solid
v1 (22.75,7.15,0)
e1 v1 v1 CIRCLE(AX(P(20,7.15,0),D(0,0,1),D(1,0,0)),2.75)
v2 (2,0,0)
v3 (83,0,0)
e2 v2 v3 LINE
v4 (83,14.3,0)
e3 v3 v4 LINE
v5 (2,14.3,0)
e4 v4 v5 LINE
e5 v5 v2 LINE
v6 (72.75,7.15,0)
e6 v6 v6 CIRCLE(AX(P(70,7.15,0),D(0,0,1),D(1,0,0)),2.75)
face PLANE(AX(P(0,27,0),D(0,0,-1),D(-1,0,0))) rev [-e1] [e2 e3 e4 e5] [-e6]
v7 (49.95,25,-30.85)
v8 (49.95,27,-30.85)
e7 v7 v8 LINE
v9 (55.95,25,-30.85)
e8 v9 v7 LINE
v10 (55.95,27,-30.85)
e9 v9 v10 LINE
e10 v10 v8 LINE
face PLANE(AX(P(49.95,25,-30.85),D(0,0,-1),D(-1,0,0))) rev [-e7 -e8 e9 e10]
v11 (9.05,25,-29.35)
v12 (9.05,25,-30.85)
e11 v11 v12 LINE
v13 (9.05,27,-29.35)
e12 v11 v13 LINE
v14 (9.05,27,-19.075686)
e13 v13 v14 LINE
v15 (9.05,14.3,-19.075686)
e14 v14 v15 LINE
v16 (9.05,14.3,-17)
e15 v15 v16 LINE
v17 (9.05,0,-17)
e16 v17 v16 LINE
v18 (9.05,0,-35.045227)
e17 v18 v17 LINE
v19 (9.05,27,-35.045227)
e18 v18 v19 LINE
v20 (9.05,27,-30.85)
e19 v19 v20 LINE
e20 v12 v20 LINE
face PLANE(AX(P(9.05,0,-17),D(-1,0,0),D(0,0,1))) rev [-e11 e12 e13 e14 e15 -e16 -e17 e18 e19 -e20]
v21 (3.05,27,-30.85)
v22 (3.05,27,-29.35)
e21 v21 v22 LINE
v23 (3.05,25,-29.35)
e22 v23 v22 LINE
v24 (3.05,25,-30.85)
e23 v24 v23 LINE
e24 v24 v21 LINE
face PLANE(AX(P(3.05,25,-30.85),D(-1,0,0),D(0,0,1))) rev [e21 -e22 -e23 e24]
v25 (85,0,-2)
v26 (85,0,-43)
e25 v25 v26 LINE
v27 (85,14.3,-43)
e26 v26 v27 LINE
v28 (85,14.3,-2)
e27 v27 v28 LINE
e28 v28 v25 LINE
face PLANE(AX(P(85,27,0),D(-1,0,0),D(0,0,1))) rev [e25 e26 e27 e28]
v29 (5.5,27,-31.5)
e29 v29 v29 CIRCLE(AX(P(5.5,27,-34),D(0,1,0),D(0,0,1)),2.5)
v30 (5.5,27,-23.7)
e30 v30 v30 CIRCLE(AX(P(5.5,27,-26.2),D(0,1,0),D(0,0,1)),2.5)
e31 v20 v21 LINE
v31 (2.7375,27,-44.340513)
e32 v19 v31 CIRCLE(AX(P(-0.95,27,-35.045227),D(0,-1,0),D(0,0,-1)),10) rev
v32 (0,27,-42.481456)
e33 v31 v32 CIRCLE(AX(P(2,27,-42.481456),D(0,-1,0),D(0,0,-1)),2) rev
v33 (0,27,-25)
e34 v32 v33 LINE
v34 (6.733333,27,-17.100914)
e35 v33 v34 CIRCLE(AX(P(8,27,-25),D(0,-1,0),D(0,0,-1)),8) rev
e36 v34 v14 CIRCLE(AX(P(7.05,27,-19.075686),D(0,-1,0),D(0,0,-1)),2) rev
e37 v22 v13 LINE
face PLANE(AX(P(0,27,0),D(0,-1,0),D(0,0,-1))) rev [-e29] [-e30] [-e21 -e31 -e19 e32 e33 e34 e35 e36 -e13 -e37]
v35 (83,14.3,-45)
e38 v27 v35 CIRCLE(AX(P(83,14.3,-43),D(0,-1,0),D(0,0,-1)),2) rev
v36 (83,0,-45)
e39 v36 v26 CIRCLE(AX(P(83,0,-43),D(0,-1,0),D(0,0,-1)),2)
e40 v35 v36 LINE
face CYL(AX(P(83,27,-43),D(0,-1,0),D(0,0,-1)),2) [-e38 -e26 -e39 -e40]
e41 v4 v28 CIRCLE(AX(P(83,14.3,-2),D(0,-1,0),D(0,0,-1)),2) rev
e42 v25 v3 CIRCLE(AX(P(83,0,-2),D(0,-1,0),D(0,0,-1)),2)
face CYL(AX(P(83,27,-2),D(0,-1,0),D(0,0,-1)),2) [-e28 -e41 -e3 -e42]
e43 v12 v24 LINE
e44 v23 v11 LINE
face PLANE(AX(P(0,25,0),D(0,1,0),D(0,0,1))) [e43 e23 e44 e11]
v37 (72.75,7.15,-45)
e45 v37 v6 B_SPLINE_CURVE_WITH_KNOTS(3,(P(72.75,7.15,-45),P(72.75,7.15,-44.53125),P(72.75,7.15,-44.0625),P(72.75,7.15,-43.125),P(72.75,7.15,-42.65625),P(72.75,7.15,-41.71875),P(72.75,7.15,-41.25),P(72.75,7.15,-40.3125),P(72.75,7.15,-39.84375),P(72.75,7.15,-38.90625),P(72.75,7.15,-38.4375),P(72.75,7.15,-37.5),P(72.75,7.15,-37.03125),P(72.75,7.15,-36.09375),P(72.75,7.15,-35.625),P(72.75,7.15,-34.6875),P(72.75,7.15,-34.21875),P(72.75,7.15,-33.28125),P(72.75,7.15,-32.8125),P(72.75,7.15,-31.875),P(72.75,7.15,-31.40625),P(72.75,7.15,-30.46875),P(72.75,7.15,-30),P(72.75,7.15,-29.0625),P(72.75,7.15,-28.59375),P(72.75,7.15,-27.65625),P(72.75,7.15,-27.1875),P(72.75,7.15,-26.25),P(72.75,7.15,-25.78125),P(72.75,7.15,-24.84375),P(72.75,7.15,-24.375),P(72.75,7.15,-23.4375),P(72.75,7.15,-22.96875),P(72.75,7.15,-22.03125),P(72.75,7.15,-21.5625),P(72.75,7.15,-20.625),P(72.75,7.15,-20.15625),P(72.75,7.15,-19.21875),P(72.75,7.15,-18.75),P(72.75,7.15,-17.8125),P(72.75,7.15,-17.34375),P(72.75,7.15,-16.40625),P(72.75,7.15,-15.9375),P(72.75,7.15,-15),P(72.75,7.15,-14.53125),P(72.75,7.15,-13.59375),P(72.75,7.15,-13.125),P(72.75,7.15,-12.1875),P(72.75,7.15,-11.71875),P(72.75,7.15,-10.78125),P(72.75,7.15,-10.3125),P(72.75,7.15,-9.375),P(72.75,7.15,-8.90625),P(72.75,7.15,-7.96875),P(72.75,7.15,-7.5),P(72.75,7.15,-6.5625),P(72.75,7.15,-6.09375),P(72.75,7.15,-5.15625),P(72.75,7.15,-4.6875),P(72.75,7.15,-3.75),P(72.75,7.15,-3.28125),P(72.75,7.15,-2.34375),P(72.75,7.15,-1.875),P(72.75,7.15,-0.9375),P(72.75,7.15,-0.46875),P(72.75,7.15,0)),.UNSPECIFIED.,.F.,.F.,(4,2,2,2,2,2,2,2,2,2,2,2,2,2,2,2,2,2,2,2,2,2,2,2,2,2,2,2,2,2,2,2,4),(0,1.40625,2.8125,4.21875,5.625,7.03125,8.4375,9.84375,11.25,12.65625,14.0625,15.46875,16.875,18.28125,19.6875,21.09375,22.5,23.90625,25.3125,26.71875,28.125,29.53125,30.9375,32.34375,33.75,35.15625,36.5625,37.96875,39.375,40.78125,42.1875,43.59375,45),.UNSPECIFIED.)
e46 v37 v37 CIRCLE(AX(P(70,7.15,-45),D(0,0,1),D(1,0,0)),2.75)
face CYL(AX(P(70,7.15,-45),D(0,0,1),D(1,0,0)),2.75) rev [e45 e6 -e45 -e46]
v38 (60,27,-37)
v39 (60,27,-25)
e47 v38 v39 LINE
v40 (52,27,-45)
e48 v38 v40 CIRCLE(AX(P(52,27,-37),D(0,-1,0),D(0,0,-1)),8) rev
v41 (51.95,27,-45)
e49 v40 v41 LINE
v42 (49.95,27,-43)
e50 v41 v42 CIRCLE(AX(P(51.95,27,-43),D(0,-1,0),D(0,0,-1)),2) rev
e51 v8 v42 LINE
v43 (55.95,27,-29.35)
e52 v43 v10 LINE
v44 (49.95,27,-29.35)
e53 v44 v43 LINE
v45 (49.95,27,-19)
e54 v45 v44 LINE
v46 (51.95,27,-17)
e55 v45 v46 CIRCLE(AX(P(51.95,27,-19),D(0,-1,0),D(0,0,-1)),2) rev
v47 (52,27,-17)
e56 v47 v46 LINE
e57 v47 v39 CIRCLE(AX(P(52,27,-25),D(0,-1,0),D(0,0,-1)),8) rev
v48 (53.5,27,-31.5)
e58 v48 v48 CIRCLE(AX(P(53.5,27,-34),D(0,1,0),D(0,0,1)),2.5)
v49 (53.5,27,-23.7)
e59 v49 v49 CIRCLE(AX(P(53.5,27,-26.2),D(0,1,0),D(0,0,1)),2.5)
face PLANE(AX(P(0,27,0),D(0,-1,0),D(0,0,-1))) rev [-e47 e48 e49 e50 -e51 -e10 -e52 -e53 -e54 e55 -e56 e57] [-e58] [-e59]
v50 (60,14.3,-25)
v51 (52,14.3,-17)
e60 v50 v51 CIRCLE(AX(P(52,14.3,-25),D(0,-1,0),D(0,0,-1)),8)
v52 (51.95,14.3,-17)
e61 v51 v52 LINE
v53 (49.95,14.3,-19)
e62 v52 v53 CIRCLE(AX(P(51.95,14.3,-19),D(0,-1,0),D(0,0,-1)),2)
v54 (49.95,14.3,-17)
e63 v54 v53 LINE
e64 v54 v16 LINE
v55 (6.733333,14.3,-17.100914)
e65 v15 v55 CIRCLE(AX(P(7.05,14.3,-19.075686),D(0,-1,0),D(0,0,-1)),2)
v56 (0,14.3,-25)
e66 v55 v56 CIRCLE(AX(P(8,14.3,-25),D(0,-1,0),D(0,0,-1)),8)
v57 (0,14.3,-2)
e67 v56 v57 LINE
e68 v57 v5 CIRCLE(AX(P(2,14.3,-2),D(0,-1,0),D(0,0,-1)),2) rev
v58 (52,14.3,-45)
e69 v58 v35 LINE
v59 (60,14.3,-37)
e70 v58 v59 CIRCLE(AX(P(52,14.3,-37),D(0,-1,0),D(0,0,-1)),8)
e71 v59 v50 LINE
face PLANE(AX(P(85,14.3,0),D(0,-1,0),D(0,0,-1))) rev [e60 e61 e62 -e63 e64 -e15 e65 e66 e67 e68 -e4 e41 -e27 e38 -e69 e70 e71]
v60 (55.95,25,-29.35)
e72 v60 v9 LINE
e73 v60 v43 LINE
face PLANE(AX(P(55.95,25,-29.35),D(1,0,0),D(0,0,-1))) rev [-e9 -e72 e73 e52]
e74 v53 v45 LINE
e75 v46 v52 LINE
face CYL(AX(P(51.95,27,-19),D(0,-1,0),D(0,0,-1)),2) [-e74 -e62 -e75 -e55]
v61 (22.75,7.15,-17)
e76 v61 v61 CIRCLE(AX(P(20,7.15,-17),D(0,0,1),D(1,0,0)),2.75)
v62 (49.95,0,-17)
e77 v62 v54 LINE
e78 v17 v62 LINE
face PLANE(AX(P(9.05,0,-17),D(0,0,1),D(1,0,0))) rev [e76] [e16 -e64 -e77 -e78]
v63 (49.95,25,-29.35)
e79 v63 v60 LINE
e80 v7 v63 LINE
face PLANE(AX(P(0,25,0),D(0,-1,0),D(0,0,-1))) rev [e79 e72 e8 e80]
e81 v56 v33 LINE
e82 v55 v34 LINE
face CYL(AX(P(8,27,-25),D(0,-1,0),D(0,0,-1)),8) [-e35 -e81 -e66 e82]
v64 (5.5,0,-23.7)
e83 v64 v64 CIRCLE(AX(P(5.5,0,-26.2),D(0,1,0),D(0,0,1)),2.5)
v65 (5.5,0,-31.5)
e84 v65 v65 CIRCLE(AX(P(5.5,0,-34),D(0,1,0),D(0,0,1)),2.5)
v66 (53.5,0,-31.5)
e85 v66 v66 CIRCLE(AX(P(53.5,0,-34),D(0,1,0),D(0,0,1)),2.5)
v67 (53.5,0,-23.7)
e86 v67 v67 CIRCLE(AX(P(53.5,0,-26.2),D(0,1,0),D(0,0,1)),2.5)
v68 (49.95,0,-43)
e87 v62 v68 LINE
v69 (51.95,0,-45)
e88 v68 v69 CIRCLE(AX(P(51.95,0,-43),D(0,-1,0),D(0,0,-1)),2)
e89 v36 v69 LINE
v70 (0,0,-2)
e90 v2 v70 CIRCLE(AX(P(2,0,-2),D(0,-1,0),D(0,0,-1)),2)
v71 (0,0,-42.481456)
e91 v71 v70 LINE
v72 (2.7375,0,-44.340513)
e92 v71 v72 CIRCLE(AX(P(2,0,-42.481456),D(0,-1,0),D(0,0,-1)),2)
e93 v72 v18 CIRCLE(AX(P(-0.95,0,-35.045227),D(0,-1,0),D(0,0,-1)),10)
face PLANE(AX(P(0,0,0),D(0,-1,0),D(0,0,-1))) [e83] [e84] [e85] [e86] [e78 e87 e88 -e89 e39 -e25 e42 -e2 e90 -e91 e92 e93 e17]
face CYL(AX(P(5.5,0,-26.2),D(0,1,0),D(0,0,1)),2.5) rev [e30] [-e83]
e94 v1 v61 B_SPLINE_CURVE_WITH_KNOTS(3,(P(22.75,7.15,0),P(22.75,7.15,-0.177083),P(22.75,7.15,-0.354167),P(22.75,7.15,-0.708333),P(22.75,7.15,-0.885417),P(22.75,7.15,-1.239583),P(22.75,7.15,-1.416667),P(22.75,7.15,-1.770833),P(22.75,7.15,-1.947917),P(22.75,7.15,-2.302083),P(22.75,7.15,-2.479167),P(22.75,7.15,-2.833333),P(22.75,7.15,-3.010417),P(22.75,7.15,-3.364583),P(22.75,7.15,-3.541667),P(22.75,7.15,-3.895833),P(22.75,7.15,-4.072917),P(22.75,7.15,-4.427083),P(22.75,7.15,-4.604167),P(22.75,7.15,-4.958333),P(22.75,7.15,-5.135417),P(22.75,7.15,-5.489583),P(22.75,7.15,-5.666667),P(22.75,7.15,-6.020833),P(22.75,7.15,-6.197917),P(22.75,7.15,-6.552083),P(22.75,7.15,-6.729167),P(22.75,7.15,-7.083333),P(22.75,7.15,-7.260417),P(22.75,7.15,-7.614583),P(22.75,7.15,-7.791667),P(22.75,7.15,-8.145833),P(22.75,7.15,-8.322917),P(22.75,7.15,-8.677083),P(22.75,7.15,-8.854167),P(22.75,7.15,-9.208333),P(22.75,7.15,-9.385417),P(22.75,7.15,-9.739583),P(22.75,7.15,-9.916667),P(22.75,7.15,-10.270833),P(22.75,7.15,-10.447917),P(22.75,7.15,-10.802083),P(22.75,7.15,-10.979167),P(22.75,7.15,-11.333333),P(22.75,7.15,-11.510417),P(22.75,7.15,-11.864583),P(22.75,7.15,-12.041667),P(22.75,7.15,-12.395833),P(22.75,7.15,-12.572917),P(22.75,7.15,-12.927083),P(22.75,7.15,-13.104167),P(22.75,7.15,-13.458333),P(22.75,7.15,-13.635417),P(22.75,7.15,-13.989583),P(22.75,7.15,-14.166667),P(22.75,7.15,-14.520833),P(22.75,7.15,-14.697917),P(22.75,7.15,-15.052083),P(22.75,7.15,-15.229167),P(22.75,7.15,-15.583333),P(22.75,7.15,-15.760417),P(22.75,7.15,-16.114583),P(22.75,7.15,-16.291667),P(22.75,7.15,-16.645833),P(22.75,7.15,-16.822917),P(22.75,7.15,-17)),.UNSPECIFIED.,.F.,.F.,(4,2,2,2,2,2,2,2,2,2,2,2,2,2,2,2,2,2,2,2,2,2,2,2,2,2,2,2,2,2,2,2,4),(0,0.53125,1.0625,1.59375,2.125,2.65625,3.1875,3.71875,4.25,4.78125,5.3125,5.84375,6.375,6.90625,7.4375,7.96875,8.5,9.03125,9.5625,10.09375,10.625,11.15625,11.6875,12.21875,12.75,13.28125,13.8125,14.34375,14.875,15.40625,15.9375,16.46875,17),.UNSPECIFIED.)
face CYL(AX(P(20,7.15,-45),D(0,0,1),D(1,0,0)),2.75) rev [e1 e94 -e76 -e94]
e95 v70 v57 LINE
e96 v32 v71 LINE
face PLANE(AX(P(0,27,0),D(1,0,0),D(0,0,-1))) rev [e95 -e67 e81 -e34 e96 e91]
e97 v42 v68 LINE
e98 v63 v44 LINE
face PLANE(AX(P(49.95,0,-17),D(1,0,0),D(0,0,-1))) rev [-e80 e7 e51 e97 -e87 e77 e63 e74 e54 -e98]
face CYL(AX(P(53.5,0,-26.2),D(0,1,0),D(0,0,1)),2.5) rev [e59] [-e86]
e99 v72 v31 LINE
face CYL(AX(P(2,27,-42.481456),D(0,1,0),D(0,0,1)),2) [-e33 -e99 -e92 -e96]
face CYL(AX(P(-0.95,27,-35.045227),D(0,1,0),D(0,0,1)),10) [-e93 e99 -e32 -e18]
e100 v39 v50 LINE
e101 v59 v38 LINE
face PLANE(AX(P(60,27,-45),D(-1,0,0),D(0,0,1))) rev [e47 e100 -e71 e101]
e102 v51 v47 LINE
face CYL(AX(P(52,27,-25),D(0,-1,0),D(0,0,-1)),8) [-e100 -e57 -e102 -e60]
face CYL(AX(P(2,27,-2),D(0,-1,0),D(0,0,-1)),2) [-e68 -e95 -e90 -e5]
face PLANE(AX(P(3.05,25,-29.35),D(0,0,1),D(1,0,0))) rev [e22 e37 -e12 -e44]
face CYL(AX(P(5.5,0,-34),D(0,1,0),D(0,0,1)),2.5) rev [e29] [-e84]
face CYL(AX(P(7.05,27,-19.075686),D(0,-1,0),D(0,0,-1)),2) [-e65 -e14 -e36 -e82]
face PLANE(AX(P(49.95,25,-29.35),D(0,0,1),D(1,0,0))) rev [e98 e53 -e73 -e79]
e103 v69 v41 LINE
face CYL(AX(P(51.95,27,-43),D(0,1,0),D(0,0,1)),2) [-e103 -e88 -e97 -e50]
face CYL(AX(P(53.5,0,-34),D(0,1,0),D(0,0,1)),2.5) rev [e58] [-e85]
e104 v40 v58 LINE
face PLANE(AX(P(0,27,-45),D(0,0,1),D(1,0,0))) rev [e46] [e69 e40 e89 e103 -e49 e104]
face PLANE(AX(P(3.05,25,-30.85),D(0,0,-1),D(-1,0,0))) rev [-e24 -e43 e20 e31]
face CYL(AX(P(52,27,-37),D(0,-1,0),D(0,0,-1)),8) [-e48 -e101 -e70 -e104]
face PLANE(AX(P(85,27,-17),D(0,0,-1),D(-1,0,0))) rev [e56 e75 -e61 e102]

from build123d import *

# Parameters (mm, degrees)
SKETCH1_W           = 85
SKETCH1_H           = 45
BOSS_EXTRUDE1_DEPTH = 27
SKETCH2_R           = 2.5
CUT_EXTRUDE1_DEPTH  = 100.894944817
SKETCH4_W           = 17
SKETCH4_H           = 12.7
CUT_EXTRUDE2_DEPTH  = 100.894944817
SKETCH5_W           = 25
SKETCH5_H           = 12.7
CUT_EXTRUDE3_DEPTH  = 94.477269964
SKETCH6_W           = 40.9
SKETCH6_H           = 28
CUT_EXTRUDE4_DEPTH  = 100.894944817
FILLET1_R           = 10
FILLET2_R           = 8
FILLET4_R           = 2
SKETCH7_R           = 2.75
CUT_EXTRUDE5_DEPTH  = 100.894944817
SKETCH8_W           = 6
SKETCH8_H           = 1.5
CUT_EXTRUDE6_DEPTH  = 2


with BuildPart() as part:
    # Sketch1 → Boss-Extrude1 (new body)
    with BuildSketch(Plane(origin=(0, 0, 0), x_dir=(1, 0, 0), z_dir=(0, 1, 0))):
        with Locations((42.5, 22.5)):
            Rectangle(SKETCH1_W, SKETCH1_H)
    extrude(amount=BOSS_EXTRUDE1_DEPTH)

    # Sketch2 → Cut-Extrude1 (cut, through all)
    with BuildSketch(Plane(origin=(0, 27, 0), x_dir=(1, 0, 0), z_dir=(0, 1, 0))):
        with Locations(Location((5.5, 34, 0), (0, 0, 270))):
            Circle(SKETCH2_R)
        with Locations(Location((53.5, 34, 0), (0, 0, 270))):
            Circle(SKETCH2_R)
        with Locations(Location((53.5, 26.2, 0), (0, 0, 270))):
            Circle(SKETCH2_R)
        with Locations(Location((5.5, 26.2, 0), (0, 0, 270))):
            Circle(SKETCH2_R)
    extrude(amount=-CUT_EXTRUDE1_DEPTH, mode=Mode.SUBTRACT)

    # Sketch4 → Cut-Extrude2 (cut, through all)
    with BuildSketch(Plane.ZY):
        with Locations((-8.5, 20.65)):
            Rectangle(SKETCH4_W, SKETCH4_H)
    extrude(amount=-CUT_EXTRUDE2_DEPTH, mode=Mode.SUBTRACT)

    # Sketch5 → Cut-Extrude3 (cut, through all)
    with BuildSketch(Plane.XY.offset(-17)):
        with Locations((72.5, 20.65)):
            Rectangle(SKETCH5_W, SKETCH5_H)
    extrude(amount=-CUT_EXTRUDE3_DEPTH, mode=Mode.SUBTRACT)

    # Sketch6 → Cut-Extrude4 (cut, through all)
    with BuildSketch(Plane(origin=(0, 27, 0), x_dir=(1, 0, 0), z_dir=(0, 1, 0))):
        with Locations((29.5, 31)):
            Rectangle(SKETCH6_W, SKETCH6_H)
    extrude(amount=-CUT_EXTRUDE4_DEPTH, mode=Mode.SUBTRACT)

    # Fillet1
    # the kernel refuses this fillet: 10 mm, written as the material it takes off along each edge
    with BuildSketch(Plane(origin=(9.05, 51.886931812, -45), x_dir=(-1, 0, 0), z_dir=(0, -1, 0))) as fillet1_piece_1:
        with BuildLine():
            CenterArc((10, -9.954772725), FILLET1_R, 95.451319812, 84.548680188)
            Line((0, -9.954772725), (-0.2, -9.954772725))
            Line((-0.2, -9.954772725), (-0.2, 0))
            Line((-0.2, 0), (0, 0.2))
            ThreePointArc((0, 0.2), (4.525, 0.2), (9.031, 0.199095454))
            Line((9.031, 0.199095454), (9.05, 0))
        make_face()
    extrude(amount=76.773863623, mode=Mode.SUBTRACT)

    # Fillet2
    fillet2_edges = [part.edges().sort_by_distance(p)[0] for p in [
        (0, 20.65, -17),
        (60, 20.65, -45),
        (60, 20.65, -17),
    ]]
    fillet(fillet2_edges, radius=FILLET2_R)

    # Fillet4
    # the kernel refuses this fillet: 2 mm, written as the material it takes off along each edge
    with BuildSketch(Plane(origin=(9.05, 32.797158858, -17), x_dir=(0, 0, -1), z_dir=(0, -1, 0))) as fillet4_piece_1:
        with BuildLine():
            CenterArc((2.075685694, -2), FILLET4_R, 90, 99.110170153)
            Line((0.100914258, -2.316666667), (-0.096562885, -2.348333333))
            ThreePointArc((-0.096562885, -2.348333333), (-0.2, -1.05), (-0.2, 0))
            Line((-0.2, 0), (0, 0.2))
            Line((0, 0.2), (2.075685694, 0.2))
            Line((2.075685694, 0.2), (2.075685694, 0))
        make_face()
    extrude(amount=18.497158858, mode=Mode.SUBTRACT)
    with BuildSketch(Plane(origin=(49.95, 32, -17), x_dir=(0, 0, -1), z_dir=(0, -1, 0))) as fillet4_piece_2:
        with BuildLine():
            CenterArc((FILLET4_R, FILLET4_R), FILLET4_R, 180, 90)
            Line((0, FILLET4_R), (0, 0))
            Line((0, 0), (FILLET4_R, 0))
        make_face()
    extrude(amount=17.7, mode=Mode.SUBTRACT)
    with BuildSketch(Plane(origin=(49.95, 32, -45), x_dir=(0, 0, 1), z_dir=(0, -1, 0))) as fillet4_piece_3:
        with BuildLine():
            CenterArc((FILLET4_R, -FILLET4_R), FILLET4_R, 90, 90)
            Line((0, -FILLET4_R), (0, 0))
            Line((0, 0), (FILLET4_R, 0))
        make_face()
    extrude(amount=37, mode=Mode.SUBTRACT)
    with BuildSketch(Plane(origin=(85, -5, -45), x_dir=(0, 0, 1), z_dir=(0, 1, 0)), Plane(origin=(85, -5, 0), x_dir=(-1, 0, 0), z_dir=(0, 1, 0)), Plane(origin=(0, -5, 0), x_dir=(0, 0, -1), z_dir=(0, 1, 0))) as fillet4_piece_4:
        with BuildLine():
            CenterArc((FILLET4_R, -FILLET4_R), FILLET4_R, 90, 90)
            Line((0, -FILLET4_R), (0, 0))
            Line((0, 0), (FILLET4_R, 0))
        make_face()
    extrude(amount=24.3, mode=Mode.SUBTRACT)
    with BuildSketch(Plane(origin=(0, -7.039544043, -45), x_dir=(0.972186544788057, 0, 0.23420786095487744), z_dir=(0, 1, 0))) as fillet4_piece_5:
        with BuildLine():
            CenterArc((2.534235855, -1.980078713), FILLET4_R, 81.906386313, 111.638547186)
            Line((0.589862766, -2.448494435), (0, 0))
            ThreePointArc((0, 0), (1.407908809, 0.099606433), (2.815817617, 0))
        make_face()
    extrude(amount=41.079088086, mode=Mode.SUBTRACT)

    # Sketch7 → Cut-Extrude5 (cut, through all)
    with BuildSketch(Plane.XY):
        with Locations((70, 7.15)):
            Circle(SKETCH7_R)
        with Locations((20, 7.15)):
            Circle(SKETCH7_R)
    extrude(amount=-CUT_EXTRUDE5_DEPTH, mode=Mode.SUBTRACT)

    # Sketch8 → Cut-Extrude6 (cut)
    with BuildSketch(Plane(origin=(0, 27, 0), x_dir=(1, 0, 0), z_dir=(0, 1, 0))):
        with Locations((6.05, 30.1)):
            Rectangle(SKETCH8_W, SKETCH8_H)
        with Locations((52.95, 30.1)):
            Rectangle(SKETCH8_W, SKETCH8_H)
    extrude(amount=-CUT_EXTRUDE6_DEPTH, mode=Mode.SUBTRACT)


solid = part.part
